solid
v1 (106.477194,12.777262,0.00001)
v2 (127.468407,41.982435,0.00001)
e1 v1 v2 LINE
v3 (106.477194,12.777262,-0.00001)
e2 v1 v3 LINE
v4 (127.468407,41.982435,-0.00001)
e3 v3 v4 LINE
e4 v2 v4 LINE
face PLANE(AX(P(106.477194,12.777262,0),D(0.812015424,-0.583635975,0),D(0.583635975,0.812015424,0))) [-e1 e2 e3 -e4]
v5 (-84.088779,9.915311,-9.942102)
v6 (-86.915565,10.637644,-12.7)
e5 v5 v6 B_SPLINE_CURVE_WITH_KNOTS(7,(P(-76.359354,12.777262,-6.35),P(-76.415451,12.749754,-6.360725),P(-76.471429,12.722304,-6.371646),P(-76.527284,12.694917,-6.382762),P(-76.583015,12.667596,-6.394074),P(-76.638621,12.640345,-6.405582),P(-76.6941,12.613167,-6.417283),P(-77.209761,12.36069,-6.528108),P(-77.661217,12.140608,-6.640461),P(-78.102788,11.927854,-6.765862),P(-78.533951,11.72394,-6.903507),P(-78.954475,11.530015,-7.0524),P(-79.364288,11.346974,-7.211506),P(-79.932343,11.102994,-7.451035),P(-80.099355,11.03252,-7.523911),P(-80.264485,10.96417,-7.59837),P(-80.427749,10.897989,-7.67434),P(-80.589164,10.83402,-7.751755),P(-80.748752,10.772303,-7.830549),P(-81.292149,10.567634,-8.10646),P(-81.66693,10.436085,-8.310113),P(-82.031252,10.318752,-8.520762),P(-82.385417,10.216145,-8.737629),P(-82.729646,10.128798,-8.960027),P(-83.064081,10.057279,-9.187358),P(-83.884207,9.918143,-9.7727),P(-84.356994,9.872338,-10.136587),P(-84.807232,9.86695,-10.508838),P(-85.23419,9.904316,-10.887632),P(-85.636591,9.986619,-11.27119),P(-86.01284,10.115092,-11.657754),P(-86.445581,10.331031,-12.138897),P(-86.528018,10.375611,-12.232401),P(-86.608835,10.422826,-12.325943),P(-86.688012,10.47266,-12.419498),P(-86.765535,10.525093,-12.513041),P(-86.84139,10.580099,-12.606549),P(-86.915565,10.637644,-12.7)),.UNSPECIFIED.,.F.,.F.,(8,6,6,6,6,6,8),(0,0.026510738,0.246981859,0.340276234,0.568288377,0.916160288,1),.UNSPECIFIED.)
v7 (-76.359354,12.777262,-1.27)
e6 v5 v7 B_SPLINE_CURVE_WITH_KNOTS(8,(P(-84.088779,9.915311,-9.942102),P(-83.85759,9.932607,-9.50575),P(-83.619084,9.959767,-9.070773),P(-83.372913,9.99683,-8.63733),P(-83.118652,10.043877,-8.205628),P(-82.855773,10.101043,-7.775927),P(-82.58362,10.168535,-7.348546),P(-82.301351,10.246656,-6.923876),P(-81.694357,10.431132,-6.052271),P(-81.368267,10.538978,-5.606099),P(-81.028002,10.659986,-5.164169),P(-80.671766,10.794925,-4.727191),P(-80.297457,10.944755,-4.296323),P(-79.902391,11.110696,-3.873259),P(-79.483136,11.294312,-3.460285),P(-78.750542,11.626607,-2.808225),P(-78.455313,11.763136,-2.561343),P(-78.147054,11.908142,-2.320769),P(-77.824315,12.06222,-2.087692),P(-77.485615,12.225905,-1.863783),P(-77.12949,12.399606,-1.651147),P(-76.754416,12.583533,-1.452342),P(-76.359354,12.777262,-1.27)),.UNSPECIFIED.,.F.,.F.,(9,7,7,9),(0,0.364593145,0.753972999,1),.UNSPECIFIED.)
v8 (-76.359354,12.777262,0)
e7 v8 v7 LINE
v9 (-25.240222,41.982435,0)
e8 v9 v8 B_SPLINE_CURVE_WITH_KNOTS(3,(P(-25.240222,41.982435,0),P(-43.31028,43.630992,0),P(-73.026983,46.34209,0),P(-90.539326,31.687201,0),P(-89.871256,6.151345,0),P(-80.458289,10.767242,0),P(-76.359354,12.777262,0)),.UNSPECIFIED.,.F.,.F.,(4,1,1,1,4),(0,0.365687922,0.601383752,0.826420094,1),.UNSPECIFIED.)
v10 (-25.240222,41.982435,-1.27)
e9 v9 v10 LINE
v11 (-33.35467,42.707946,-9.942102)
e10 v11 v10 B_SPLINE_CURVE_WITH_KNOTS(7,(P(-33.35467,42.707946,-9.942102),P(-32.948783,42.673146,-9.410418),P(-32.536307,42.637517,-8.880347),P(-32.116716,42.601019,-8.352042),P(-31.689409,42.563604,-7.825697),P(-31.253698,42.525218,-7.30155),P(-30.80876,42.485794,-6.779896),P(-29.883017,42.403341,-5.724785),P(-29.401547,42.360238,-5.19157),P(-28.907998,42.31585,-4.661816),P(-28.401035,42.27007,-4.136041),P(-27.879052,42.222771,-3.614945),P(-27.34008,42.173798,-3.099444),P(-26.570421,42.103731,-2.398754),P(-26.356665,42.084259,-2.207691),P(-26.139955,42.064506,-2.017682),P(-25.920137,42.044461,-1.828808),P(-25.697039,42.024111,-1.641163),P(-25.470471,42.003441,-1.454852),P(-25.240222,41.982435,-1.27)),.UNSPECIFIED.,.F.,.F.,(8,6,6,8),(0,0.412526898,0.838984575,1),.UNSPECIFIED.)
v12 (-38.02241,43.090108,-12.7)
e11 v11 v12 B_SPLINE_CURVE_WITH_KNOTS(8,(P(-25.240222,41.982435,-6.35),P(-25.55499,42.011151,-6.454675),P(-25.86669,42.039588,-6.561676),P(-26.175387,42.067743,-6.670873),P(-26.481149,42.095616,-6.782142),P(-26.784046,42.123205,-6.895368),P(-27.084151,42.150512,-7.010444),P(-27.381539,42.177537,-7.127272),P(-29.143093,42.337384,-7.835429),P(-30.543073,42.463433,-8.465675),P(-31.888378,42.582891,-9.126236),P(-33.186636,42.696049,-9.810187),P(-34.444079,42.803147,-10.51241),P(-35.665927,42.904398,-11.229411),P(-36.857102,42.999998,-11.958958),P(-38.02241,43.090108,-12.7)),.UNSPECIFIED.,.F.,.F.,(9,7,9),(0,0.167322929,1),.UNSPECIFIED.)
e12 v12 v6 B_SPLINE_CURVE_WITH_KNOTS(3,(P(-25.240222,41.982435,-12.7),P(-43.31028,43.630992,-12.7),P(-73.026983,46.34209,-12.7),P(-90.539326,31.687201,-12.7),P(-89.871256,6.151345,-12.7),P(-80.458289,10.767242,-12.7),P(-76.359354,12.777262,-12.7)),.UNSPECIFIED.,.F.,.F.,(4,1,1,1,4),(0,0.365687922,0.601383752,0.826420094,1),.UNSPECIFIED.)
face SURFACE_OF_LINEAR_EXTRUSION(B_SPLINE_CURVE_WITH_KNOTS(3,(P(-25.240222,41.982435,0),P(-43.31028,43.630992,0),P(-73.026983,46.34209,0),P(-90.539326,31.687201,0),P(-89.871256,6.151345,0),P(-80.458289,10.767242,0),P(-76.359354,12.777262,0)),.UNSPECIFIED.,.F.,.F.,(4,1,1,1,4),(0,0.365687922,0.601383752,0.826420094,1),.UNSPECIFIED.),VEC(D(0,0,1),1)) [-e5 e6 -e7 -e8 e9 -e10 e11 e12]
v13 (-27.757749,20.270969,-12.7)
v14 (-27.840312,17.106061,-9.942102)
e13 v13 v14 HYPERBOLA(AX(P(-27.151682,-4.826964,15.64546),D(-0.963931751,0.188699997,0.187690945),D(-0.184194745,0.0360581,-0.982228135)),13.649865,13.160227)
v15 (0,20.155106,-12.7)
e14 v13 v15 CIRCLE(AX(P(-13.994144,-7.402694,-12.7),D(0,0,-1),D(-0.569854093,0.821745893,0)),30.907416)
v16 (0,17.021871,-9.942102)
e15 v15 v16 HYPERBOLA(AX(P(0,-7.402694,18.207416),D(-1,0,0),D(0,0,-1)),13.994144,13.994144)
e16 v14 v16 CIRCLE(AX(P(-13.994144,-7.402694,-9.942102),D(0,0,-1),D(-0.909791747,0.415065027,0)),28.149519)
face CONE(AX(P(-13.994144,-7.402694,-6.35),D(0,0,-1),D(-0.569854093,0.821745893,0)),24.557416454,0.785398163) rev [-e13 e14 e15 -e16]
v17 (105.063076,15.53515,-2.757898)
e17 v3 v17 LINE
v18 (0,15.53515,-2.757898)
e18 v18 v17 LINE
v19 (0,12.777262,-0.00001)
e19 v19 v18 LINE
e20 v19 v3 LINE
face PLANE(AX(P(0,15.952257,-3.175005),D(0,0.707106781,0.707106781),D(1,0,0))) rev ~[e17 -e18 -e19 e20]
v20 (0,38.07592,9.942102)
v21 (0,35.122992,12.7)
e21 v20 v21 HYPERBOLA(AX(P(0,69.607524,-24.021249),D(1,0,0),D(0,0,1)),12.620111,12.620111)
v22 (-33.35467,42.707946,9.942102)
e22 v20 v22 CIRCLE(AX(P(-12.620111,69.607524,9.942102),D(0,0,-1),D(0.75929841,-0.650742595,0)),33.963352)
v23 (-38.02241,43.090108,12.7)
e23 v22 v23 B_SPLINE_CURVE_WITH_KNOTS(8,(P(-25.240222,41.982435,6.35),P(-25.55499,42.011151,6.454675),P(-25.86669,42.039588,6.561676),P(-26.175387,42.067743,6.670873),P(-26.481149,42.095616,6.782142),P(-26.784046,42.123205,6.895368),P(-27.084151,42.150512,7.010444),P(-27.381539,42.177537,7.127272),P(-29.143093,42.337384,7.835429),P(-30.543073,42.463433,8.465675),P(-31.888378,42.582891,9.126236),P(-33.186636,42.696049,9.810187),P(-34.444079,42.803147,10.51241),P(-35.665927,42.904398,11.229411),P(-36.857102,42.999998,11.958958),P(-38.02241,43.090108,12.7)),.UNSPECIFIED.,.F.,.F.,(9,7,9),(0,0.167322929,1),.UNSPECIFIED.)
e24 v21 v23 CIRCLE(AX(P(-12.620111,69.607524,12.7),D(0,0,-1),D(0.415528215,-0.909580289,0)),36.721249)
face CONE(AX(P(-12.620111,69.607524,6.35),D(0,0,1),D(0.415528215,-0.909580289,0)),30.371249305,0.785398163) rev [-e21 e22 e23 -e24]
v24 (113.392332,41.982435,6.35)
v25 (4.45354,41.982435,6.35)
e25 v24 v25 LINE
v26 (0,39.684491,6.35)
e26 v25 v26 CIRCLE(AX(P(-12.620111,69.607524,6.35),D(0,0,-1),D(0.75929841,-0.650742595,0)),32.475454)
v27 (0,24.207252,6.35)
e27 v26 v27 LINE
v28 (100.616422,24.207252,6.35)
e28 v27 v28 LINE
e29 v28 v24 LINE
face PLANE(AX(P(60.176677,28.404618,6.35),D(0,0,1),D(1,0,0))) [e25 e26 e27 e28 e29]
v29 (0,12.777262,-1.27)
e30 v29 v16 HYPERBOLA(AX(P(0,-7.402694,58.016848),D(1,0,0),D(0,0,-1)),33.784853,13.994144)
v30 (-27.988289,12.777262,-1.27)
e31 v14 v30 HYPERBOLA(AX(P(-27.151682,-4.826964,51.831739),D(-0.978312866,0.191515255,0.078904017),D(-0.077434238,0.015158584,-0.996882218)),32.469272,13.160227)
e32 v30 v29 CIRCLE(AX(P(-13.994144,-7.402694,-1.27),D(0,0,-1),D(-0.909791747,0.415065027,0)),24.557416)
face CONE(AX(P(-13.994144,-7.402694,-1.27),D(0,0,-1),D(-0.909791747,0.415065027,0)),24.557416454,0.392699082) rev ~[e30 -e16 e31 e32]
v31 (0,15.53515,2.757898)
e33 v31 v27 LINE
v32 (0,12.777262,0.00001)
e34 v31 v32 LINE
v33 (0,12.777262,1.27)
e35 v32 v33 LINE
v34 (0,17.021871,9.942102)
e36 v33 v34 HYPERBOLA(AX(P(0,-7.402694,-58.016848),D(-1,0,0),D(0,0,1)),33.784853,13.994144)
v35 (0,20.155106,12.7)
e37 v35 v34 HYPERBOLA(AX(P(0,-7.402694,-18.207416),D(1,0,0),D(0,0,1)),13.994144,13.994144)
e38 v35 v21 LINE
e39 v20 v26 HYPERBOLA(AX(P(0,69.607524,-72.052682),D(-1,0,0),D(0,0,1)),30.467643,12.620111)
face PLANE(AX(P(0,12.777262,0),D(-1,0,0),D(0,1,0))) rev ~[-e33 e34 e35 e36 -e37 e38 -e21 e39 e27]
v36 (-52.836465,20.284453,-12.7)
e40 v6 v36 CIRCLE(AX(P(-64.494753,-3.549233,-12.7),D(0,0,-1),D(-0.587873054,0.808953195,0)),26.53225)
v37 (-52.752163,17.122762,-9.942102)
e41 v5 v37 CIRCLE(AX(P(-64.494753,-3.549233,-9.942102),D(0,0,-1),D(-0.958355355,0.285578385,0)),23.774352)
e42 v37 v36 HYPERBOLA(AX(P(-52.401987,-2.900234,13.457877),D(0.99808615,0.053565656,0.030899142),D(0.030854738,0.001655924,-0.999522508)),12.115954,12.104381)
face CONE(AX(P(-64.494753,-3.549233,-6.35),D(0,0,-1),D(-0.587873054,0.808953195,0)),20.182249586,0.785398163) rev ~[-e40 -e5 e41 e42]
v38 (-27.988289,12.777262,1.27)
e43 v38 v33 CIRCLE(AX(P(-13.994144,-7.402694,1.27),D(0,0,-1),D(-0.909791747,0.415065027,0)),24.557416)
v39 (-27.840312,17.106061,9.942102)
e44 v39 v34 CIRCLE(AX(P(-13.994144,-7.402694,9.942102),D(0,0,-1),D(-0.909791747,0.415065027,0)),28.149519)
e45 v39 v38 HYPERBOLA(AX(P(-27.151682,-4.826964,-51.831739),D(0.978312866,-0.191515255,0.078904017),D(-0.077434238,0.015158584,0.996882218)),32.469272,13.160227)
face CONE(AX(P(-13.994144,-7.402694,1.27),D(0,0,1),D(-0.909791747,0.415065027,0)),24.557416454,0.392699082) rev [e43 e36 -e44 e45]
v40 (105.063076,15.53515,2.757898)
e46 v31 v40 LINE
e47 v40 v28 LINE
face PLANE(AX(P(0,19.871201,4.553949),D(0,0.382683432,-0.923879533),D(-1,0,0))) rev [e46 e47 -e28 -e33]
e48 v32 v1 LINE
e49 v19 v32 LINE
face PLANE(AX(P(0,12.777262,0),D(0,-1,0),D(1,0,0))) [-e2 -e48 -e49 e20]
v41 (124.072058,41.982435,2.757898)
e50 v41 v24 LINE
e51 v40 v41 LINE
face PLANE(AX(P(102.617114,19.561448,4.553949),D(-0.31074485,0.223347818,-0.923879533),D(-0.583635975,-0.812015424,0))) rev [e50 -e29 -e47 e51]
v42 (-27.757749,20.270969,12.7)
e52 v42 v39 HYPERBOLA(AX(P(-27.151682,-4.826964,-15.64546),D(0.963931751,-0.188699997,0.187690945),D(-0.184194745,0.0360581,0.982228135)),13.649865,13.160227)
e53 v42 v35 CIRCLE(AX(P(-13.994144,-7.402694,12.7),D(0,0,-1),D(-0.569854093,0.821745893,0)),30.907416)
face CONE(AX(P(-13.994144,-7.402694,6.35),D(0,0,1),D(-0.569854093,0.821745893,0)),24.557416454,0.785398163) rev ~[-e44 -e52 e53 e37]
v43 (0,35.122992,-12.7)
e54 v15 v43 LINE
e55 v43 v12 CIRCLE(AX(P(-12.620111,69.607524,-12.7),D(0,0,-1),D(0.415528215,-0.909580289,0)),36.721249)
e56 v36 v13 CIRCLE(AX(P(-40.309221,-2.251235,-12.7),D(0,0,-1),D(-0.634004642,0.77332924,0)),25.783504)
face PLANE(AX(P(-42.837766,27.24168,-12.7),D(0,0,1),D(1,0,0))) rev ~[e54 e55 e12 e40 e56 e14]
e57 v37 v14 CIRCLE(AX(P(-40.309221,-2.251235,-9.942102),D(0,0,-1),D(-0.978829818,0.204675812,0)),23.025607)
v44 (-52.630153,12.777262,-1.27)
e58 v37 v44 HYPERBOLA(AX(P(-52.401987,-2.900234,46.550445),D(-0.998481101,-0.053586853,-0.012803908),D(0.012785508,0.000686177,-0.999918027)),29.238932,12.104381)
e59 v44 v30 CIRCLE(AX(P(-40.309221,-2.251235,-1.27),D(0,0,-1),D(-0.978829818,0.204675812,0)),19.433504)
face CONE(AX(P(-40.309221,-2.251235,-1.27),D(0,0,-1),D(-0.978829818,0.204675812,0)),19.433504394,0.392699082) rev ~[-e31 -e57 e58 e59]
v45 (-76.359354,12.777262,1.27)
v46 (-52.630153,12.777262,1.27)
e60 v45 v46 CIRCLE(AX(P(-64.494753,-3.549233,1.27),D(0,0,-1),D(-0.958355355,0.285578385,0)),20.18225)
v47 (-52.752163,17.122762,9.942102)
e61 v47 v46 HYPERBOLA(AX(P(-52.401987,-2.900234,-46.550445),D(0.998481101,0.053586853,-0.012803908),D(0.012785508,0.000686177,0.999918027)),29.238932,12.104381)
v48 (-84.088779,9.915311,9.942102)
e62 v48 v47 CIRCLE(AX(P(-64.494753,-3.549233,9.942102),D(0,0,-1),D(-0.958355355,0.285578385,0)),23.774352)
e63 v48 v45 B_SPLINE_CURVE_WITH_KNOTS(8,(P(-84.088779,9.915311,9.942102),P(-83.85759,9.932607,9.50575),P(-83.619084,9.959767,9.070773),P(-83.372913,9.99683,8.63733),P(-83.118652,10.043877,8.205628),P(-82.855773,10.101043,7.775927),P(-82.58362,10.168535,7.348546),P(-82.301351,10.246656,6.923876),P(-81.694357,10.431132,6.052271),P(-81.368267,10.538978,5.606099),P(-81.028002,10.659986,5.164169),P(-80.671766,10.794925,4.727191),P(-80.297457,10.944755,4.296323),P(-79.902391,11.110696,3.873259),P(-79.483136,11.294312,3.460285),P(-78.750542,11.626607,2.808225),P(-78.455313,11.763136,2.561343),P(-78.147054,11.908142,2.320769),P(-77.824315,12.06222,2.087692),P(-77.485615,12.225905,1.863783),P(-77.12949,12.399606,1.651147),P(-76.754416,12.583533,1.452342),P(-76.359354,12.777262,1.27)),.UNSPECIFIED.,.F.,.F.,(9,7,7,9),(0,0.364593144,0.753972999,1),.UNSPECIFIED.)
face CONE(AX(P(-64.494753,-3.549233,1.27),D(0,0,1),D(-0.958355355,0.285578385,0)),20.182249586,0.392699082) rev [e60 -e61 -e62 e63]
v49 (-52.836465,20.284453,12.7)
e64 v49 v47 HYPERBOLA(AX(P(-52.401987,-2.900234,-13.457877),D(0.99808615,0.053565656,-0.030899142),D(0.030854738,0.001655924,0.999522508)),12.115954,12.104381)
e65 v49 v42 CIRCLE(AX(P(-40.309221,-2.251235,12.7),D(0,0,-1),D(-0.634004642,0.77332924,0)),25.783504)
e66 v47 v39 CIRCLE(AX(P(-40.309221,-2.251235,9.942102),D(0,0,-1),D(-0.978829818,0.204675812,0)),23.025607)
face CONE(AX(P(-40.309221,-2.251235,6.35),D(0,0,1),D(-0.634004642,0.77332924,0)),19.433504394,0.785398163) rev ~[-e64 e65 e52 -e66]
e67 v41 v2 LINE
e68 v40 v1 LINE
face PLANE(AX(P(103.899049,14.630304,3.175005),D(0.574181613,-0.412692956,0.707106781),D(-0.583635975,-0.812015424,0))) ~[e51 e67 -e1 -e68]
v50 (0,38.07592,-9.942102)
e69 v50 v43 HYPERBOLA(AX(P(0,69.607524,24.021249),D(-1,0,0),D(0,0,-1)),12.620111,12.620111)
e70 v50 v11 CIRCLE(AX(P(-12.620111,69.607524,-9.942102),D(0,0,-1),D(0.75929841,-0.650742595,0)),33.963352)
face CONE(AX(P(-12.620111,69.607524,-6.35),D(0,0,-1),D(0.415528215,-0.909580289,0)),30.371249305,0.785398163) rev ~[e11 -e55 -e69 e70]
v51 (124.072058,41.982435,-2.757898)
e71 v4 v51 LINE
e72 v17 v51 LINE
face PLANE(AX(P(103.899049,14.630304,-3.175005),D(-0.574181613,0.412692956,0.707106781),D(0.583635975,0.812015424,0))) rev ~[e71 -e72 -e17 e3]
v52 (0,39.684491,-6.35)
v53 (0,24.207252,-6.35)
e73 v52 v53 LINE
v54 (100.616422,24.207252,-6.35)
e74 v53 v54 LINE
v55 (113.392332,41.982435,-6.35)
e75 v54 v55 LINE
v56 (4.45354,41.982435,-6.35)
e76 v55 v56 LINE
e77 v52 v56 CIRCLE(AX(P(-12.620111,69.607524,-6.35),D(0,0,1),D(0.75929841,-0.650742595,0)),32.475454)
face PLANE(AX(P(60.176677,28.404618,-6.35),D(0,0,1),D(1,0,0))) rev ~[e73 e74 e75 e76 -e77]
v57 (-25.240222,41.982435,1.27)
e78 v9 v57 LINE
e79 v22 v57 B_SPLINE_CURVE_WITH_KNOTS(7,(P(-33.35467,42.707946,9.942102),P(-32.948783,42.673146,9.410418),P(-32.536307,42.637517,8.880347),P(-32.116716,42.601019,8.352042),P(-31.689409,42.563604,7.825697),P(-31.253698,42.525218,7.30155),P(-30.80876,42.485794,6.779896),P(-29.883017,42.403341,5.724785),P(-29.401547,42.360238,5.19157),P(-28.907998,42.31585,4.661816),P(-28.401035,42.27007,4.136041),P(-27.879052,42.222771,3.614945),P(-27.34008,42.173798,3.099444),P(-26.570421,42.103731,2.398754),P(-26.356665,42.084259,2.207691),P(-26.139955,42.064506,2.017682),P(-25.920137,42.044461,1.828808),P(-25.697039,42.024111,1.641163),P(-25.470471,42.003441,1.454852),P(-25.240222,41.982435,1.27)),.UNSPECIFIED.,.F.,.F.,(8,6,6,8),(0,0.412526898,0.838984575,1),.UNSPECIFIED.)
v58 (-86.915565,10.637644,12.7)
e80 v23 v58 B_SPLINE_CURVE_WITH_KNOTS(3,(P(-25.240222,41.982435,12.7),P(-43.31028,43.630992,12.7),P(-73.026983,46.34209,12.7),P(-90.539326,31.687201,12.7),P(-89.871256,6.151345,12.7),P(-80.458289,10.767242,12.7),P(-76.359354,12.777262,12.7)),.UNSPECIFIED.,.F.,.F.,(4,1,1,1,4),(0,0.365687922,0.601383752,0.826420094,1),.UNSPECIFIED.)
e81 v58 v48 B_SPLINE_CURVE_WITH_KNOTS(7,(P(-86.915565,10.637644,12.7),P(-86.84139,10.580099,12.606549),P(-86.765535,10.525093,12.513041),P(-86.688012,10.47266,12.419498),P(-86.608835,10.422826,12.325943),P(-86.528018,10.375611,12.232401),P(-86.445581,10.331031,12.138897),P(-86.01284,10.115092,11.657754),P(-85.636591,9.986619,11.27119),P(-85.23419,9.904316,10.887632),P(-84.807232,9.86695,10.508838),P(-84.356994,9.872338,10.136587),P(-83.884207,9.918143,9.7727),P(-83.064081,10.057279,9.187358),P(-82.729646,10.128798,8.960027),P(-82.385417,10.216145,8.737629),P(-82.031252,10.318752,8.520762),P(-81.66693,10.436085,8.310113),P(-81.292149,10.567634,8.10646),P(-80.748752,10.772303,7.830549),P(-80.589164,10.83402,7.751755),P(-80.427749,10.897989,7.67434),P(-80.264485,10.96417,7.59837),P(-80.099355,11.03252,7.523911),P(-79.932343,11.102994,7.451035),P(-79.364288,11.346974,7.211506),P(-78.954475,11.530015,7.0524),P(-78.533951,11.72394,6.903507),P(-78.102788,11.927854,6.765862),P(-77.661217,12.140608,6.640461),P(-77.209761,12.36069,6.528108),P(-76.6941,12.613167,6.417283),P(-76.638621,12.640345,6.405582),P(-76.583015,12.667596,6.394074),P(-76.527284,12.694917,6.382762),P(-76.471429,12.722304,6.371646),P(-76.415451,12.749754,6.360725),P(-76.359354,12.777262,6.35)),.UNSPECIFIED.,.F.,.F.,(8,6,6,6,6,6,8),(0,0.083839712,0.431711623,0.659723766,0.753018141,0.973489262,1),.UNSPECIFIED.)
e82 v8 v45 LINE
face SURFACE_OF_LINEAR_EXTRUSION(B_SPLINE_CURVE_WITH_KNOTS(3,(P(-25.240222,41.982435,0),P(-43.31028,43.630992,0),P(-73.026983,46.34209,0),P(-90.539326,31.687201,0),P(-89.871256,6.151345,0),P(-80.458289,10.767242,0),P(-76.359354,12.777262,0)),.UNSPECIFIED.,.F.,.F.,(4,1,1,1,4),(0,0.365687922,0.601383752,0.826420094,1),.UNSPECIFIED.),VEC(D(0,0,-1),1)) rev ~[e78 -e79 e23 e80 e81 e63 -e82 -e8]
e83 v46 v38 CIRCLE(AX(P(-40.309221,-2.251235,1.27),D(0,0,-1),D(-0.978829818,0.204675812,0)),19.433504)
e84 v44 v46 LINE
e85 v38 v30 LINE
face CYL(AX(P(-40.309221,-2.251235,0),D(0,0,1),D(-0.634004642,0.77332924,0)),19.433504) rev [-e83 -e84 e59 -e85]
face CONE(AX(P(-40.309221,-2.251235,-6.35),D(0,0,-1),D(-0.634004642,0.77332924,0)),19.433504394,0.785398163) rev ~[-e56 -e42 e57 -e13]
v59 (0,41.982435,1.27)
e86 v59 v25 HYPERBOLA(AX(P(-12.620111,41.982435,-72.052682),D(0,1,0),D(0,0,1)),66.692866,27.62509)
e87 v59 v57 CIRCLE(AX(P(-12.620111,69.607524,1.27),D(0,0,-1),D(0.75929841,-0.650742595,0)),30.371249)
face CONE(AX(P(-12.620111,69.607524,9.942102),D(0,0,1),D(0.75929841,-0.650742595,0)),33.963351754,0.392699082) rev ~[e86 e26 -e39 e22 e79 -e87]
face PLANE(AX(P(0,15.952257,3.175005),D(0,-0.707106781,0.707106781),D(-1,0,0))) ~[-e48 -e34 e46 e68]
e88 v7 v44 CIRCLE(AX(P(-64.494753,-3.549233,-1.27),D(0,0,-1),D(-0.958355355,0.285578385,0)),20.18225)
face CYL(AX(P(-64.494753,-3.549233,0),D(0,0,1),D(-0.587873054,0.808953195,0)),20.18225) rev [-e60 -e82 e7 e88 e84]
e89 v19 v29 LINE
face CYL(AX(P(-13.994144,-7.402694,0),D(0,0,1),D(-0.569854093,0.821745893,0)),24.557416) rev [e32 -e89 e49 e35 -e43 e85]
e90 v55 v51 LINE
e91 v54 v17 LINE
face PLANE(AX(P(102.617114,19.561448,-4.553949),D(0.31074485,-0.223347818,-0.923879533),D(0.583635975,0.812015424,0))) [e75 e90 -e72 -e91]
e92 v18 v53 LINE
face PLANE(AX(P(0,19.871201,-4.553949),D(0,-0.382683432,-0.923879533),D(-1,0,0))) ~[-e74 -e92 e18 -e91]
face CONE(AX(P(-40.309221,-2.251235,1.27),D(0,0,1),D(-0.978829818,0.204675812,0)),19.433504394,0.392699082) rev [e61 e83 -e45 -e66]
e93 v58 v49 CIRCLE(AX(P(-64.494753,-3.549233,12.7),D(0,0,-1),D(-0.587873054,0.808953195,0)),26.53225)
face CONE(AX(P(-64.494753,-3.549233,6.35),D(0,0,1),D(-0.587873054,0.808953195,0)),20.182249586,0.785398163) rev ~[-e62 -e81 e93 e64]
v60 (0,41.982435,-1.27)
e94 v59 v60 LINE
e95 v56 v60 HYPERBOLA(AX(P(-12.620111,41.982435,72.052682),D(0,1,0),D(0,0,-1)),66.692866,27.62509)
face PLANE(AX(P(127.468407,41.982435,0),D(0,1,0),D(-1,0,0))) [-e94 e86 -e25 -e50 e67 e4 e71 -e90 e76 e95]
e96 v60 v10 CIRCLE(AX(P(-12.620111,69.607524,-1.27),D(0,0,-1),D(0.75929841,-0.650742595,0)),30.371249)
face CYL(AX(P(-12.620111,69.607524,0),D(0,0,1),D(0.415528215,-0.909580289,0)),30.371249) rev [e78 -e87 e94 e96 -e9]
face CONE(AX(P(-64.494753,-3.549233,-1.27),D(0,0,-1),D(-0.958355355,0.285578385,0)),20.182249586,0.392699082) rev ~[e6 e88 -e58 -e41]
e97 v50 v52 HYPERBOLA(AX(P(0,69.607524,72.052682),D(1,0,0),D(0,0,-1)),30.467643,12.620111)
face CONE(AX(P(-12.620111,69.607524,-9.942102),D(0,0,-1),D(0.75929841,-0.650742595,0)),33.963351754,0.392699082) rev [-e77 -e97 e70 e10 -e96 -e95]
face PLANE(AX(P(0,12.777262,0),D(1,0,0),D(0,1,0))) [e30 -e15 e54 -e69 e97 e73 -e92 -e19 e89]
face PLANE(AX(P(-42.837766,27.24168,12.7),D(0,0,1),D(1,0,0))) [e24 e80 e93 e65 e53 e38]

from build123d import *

# Parameters (mm, degrees)
F1_DEPTH      = 6.35
F1_DEPTH_BACK = 6.35
F2_DEPTH      = 12.7
F2_DEPTH_BACK = 12.7
F3_SIZE       = 6.34999
F4_SIZE       = 6.35
F5_T2_ANGLE   = 130.9531767825
F5_T4_ANGLE   = 156.3789559007
F5_T6_ANGLE   = 146.8131509544
F5_T8_ANGLE   = 146.8131509544
F5_T10_ANGLE  = 156.3789559007
F5_T12_ANGLE  = 130.9531767825
F5_T14_ANGLE  = 98.8047724995
F5_T16_ANGLE  = 98.8047724995
F6_SIZE       = 5.08


# Not quite as in the source:
# - a fillet or chamfer that OpenCascade refuses, or shapes differently, is made with other operations: its cross-section is extruded or revolved along the edge and cut away or added
# - a fillet or chamfer is up to 0.001 mm smaller than in the source, because OpenCascade refuses the exact size


with BuildPart() as f1:
    # F0 (on Top) → F1 (new body, two sides)
    with BuildSketch(Plane.XY) as f1_sk:
        Polygon((127.4684071541, 41.98243469), (0, 41.98243469), (0, 12.7772623673), (106.4771935344, 12.7772623673), align=None)
    extrude(amount=F1_DEPTH)
    extrude(f1_sk.sketch, amount=-F1_DEPTH_BACK)

    # F0 (on Top) → F2 (join, two sides)
    with BuildSketch(Plane.XY) as f2_sk:
        with BuildLine():
            Line((0, 12.7772623673), (0, 41.98243469))
            ThreePointArc((0, 41.98243469), (-12.6201109961, 39.2362751187), (-25.2402219921, 41.98243469))
            add(Edge.make_bspline(
                [(-25.2402219921, 41.98243469), (-43.3102802692, 43.6309922068), (-73.0269834828, 46.3420899634), (-90.5393262642, 31.6872008955), (-89.8712560793, 6.151344998), (-80.4582887069, 10.7672416687), (-76.3593539596, 12.7772623673)],
                knots=[0, 0, 0, 0, 0.3656879222, 0.6013837524, 0.8264200944, 1, 1, 1, 1], degree=3))
            ThreePointArc((-76.3593539596, 12.7772623673), (-64.4947532564, 16.6330166618), (-52.6301525533, 12.7772623673))
            ThreePointArc((-52.6301525533, 12.7772623673), (-40.3092205524, 17.1822695756), (-27.9882885516, 12.7772623673))
            ThreePointArc((-27.9882885516, 12.7772623673), (-13.9941442758, 17.1547227044), (0, 12.7772623673))
        make_face()
    extrude(amount=F2_DEPTH)
    extrude(f2_sk.sketch, amount=-F2_DEPTH_BACK)

    # F3 (size 6.35 in the source; OpenCascade refuses exactly that, so slightly less here)
    f3_edges = [f1.edges().sort_by_distance(p)[0] for p in [
        (53.238597, 12.777262, 6.35),
        (116.9728, 27.379849, 6.35),
        (116.9728, 27.379849, -6.35),
        (53.238597, 12.777262, -6.35),
    ]]
    chamfer(f3_edges, length=F3_SIZE)

    # F4
    f4_edges = [f1.edges().sort_by_distance(p)[0] for p in [
        (-40.309221, 17.18227, 12.7),
        (-13.994144, 17.154723, 12.7),
        (-64.494753, 16.633017, 12.7),
        (-13.994144, 17.154723, -12.7),
        (-40.309221, 17.18227, -12.7),
        (-64.494753, 16.633017, -12.7),
        (-12.620111, 39.236275, 12.7),
        (-12.620111, 39.236275, -12.7),
    ]]
    chamfer(f4_edges, length=F4_SIZE)

    # F5: chamfer of 5.08 on 8 edges, made by hand

    # F5_s1 → F5_t2 (revolve, cut)
    with BuildSketch(Plane(origin=(-5.206322323, -11.4118722971, 0), x_dir=(0, 0, 1), z_dir=(-0.415065027, -0.9097917473, 0))):
        Polygon((1.27, 34.2165741448), (9.9421024484, 37.8086765933), (6.35, 34.2165741448), align=None)
    revolve(axis=Axis((-13.9941442758, -7.4026937493, 6.35), (0, 0, -1)), revolution_arc=F5_T2_ANGLE, mode=Mode.SUBTRACT)

    # F5_s3 → F5_t4 (revolve, cut)
    with BuildSketch(Plane(origin=(-2.139660104, -10.2325872802, 0), x_dir=(0, 0, 1), z_dir=(-0.2046758119, -0.9788298177, 0))):
        Polygon((1.27, 58.4285980846), (9.9421024484, 62.020700533), (6.35, 58.4285980846), align=None)
    revolve(axis=Axis((-40.3092205524, -2.2512348183, 6.35), (0, 0, -1)), revolution_arc=F5_T4_ANGLE, mode=Mode.SUBTRACT)

    # F5_s5 → F5_t6 (revolve, cut)
    with BuildSketch(Plane(origin=(-6.2312443492, -20.9110587705, 0), x_dir=(0, 0, 1), z_dir=(-0.2855783849, -0.9583553548, 0))):
        Polygon((1.27, 80.9775575206), (9.9421024484, 84.569659969), (6.35, 80.9775575206), align=None)
    revolve(axis=Axis((-64.4947532564, -3.5492329237, 6.35), (0, 0, -1)), revolution_arc=F5_T6_ANGLE, mode=Mode.SUBTRACT)

    # F5_s7 → F5_t8 (revolve, cut)
    with BuildSketch(Plane(origin=(-6.2312443492, -20.9110587705, 0), x_dir=(0, 0, 1), z_dir=(-0.2855783849, -0.9583553548, 0))):
        Polygon((-1.27, 80.9775575206), (-9.9421024484, 84.569659969), (-6.35, 80.9775575206), align=None)
    revolve(axis=Axis((-64.4947532564, -3.5492329237, -6.35), (0, 0, -1)), revolution_arc=F5_T8_ANGLE, mode=Mode.SUBTRACT)

    # F5_s9 → F5_t10 (revolve, cut)
    with BuildSketch(Plane(origin=(-2.139660104, -10.2325872802, 0), x_dir=(0, 0, 1), z_dir=(-0.2046758119, -0.9788298177, 0))):
        Polygon((-1.27, 58.4285980846), (-9.9421024484, 62.020700533), (-6.35, 58.4285980846), align=None)
    revolve(axis=Axis((-40.3092205524, -2.2512348183, -6.35), (0, 0, -1)), revolution_arc=F5_T10_ANGLE, mode=Mode.SUBTRACT)

    # F5_s11 → F5_t12 (revolve, cut)
    with BuildSketch(Plane(origin=(-5.206322323, -11.4118722971, 0), x_dir=(0, 0, 1), z_dir=(-0.415065027, -0.9097917473, 0))):
        Polygon((-1.27, 34.2165741448), (-9.9421024484, 37.8086765933), (-6.35, 34.2165741448), align=None)
    revolve(axis=Axis((-13.9941442758, -7.4026937493, -6.35), (0, 0, -1)), revolution_arc=F5_T12_ANGLE, mode=Mode.SUBTRACT)

    # F5_s13 → F5_t14 (revolve, cut)
    with BuildSketch(Plane(origin=(29.0494350025, 33.895414243, 0), x_dir=(0, 0, 1), z_dir=(0.6507425946, 0.7592984101, 0))):
        Polygon((9.9421024484, -20.9156595103), (1.27, -24.5077619587), (6.35, -24.5077619587), align=None)
    revolve(axis=Axis((-12.6201109961, 69.6075244238, 6.35), (0, 0, -1)), revolution_arc=F5_T14_ANGLE, mode=Mode.SUBTRACT)

    # F5_s15 → F5_t16 (revolve, cut)
    with BuildSketch(Plane(origin=(29.0494350025, 33.895414243, 0), x_dir=(0, 0, 1), z_dir=(0.6507425946, 0.7592984101, 0))):
        Polygon((-9.9421024484, -20.9156595103), (-1.27, -24.5077619587), (-6.35, -24.5077619587), align=None)
    revolve(axis=Axis((-12.6201109961, 69.6075244238, -6.35), (0, 0, -1)), revolution_arc=F5_T16_ANGLE, mode=Mode.SUBTRACT)

    # F6
    f6_edges = [f1.edges().sort_by_distance(p)[0] for p in [
        (111.434791, 30.554844, -6.35),
        (51.610606, 19.127252, -6.35),
        (111.434791, 30.554844, 6.35),
        (51.610606, 19.127252, 6.35),
    ]]
    chamfer(f6_edges, length=F6_SIZE)


solid = f1.part
